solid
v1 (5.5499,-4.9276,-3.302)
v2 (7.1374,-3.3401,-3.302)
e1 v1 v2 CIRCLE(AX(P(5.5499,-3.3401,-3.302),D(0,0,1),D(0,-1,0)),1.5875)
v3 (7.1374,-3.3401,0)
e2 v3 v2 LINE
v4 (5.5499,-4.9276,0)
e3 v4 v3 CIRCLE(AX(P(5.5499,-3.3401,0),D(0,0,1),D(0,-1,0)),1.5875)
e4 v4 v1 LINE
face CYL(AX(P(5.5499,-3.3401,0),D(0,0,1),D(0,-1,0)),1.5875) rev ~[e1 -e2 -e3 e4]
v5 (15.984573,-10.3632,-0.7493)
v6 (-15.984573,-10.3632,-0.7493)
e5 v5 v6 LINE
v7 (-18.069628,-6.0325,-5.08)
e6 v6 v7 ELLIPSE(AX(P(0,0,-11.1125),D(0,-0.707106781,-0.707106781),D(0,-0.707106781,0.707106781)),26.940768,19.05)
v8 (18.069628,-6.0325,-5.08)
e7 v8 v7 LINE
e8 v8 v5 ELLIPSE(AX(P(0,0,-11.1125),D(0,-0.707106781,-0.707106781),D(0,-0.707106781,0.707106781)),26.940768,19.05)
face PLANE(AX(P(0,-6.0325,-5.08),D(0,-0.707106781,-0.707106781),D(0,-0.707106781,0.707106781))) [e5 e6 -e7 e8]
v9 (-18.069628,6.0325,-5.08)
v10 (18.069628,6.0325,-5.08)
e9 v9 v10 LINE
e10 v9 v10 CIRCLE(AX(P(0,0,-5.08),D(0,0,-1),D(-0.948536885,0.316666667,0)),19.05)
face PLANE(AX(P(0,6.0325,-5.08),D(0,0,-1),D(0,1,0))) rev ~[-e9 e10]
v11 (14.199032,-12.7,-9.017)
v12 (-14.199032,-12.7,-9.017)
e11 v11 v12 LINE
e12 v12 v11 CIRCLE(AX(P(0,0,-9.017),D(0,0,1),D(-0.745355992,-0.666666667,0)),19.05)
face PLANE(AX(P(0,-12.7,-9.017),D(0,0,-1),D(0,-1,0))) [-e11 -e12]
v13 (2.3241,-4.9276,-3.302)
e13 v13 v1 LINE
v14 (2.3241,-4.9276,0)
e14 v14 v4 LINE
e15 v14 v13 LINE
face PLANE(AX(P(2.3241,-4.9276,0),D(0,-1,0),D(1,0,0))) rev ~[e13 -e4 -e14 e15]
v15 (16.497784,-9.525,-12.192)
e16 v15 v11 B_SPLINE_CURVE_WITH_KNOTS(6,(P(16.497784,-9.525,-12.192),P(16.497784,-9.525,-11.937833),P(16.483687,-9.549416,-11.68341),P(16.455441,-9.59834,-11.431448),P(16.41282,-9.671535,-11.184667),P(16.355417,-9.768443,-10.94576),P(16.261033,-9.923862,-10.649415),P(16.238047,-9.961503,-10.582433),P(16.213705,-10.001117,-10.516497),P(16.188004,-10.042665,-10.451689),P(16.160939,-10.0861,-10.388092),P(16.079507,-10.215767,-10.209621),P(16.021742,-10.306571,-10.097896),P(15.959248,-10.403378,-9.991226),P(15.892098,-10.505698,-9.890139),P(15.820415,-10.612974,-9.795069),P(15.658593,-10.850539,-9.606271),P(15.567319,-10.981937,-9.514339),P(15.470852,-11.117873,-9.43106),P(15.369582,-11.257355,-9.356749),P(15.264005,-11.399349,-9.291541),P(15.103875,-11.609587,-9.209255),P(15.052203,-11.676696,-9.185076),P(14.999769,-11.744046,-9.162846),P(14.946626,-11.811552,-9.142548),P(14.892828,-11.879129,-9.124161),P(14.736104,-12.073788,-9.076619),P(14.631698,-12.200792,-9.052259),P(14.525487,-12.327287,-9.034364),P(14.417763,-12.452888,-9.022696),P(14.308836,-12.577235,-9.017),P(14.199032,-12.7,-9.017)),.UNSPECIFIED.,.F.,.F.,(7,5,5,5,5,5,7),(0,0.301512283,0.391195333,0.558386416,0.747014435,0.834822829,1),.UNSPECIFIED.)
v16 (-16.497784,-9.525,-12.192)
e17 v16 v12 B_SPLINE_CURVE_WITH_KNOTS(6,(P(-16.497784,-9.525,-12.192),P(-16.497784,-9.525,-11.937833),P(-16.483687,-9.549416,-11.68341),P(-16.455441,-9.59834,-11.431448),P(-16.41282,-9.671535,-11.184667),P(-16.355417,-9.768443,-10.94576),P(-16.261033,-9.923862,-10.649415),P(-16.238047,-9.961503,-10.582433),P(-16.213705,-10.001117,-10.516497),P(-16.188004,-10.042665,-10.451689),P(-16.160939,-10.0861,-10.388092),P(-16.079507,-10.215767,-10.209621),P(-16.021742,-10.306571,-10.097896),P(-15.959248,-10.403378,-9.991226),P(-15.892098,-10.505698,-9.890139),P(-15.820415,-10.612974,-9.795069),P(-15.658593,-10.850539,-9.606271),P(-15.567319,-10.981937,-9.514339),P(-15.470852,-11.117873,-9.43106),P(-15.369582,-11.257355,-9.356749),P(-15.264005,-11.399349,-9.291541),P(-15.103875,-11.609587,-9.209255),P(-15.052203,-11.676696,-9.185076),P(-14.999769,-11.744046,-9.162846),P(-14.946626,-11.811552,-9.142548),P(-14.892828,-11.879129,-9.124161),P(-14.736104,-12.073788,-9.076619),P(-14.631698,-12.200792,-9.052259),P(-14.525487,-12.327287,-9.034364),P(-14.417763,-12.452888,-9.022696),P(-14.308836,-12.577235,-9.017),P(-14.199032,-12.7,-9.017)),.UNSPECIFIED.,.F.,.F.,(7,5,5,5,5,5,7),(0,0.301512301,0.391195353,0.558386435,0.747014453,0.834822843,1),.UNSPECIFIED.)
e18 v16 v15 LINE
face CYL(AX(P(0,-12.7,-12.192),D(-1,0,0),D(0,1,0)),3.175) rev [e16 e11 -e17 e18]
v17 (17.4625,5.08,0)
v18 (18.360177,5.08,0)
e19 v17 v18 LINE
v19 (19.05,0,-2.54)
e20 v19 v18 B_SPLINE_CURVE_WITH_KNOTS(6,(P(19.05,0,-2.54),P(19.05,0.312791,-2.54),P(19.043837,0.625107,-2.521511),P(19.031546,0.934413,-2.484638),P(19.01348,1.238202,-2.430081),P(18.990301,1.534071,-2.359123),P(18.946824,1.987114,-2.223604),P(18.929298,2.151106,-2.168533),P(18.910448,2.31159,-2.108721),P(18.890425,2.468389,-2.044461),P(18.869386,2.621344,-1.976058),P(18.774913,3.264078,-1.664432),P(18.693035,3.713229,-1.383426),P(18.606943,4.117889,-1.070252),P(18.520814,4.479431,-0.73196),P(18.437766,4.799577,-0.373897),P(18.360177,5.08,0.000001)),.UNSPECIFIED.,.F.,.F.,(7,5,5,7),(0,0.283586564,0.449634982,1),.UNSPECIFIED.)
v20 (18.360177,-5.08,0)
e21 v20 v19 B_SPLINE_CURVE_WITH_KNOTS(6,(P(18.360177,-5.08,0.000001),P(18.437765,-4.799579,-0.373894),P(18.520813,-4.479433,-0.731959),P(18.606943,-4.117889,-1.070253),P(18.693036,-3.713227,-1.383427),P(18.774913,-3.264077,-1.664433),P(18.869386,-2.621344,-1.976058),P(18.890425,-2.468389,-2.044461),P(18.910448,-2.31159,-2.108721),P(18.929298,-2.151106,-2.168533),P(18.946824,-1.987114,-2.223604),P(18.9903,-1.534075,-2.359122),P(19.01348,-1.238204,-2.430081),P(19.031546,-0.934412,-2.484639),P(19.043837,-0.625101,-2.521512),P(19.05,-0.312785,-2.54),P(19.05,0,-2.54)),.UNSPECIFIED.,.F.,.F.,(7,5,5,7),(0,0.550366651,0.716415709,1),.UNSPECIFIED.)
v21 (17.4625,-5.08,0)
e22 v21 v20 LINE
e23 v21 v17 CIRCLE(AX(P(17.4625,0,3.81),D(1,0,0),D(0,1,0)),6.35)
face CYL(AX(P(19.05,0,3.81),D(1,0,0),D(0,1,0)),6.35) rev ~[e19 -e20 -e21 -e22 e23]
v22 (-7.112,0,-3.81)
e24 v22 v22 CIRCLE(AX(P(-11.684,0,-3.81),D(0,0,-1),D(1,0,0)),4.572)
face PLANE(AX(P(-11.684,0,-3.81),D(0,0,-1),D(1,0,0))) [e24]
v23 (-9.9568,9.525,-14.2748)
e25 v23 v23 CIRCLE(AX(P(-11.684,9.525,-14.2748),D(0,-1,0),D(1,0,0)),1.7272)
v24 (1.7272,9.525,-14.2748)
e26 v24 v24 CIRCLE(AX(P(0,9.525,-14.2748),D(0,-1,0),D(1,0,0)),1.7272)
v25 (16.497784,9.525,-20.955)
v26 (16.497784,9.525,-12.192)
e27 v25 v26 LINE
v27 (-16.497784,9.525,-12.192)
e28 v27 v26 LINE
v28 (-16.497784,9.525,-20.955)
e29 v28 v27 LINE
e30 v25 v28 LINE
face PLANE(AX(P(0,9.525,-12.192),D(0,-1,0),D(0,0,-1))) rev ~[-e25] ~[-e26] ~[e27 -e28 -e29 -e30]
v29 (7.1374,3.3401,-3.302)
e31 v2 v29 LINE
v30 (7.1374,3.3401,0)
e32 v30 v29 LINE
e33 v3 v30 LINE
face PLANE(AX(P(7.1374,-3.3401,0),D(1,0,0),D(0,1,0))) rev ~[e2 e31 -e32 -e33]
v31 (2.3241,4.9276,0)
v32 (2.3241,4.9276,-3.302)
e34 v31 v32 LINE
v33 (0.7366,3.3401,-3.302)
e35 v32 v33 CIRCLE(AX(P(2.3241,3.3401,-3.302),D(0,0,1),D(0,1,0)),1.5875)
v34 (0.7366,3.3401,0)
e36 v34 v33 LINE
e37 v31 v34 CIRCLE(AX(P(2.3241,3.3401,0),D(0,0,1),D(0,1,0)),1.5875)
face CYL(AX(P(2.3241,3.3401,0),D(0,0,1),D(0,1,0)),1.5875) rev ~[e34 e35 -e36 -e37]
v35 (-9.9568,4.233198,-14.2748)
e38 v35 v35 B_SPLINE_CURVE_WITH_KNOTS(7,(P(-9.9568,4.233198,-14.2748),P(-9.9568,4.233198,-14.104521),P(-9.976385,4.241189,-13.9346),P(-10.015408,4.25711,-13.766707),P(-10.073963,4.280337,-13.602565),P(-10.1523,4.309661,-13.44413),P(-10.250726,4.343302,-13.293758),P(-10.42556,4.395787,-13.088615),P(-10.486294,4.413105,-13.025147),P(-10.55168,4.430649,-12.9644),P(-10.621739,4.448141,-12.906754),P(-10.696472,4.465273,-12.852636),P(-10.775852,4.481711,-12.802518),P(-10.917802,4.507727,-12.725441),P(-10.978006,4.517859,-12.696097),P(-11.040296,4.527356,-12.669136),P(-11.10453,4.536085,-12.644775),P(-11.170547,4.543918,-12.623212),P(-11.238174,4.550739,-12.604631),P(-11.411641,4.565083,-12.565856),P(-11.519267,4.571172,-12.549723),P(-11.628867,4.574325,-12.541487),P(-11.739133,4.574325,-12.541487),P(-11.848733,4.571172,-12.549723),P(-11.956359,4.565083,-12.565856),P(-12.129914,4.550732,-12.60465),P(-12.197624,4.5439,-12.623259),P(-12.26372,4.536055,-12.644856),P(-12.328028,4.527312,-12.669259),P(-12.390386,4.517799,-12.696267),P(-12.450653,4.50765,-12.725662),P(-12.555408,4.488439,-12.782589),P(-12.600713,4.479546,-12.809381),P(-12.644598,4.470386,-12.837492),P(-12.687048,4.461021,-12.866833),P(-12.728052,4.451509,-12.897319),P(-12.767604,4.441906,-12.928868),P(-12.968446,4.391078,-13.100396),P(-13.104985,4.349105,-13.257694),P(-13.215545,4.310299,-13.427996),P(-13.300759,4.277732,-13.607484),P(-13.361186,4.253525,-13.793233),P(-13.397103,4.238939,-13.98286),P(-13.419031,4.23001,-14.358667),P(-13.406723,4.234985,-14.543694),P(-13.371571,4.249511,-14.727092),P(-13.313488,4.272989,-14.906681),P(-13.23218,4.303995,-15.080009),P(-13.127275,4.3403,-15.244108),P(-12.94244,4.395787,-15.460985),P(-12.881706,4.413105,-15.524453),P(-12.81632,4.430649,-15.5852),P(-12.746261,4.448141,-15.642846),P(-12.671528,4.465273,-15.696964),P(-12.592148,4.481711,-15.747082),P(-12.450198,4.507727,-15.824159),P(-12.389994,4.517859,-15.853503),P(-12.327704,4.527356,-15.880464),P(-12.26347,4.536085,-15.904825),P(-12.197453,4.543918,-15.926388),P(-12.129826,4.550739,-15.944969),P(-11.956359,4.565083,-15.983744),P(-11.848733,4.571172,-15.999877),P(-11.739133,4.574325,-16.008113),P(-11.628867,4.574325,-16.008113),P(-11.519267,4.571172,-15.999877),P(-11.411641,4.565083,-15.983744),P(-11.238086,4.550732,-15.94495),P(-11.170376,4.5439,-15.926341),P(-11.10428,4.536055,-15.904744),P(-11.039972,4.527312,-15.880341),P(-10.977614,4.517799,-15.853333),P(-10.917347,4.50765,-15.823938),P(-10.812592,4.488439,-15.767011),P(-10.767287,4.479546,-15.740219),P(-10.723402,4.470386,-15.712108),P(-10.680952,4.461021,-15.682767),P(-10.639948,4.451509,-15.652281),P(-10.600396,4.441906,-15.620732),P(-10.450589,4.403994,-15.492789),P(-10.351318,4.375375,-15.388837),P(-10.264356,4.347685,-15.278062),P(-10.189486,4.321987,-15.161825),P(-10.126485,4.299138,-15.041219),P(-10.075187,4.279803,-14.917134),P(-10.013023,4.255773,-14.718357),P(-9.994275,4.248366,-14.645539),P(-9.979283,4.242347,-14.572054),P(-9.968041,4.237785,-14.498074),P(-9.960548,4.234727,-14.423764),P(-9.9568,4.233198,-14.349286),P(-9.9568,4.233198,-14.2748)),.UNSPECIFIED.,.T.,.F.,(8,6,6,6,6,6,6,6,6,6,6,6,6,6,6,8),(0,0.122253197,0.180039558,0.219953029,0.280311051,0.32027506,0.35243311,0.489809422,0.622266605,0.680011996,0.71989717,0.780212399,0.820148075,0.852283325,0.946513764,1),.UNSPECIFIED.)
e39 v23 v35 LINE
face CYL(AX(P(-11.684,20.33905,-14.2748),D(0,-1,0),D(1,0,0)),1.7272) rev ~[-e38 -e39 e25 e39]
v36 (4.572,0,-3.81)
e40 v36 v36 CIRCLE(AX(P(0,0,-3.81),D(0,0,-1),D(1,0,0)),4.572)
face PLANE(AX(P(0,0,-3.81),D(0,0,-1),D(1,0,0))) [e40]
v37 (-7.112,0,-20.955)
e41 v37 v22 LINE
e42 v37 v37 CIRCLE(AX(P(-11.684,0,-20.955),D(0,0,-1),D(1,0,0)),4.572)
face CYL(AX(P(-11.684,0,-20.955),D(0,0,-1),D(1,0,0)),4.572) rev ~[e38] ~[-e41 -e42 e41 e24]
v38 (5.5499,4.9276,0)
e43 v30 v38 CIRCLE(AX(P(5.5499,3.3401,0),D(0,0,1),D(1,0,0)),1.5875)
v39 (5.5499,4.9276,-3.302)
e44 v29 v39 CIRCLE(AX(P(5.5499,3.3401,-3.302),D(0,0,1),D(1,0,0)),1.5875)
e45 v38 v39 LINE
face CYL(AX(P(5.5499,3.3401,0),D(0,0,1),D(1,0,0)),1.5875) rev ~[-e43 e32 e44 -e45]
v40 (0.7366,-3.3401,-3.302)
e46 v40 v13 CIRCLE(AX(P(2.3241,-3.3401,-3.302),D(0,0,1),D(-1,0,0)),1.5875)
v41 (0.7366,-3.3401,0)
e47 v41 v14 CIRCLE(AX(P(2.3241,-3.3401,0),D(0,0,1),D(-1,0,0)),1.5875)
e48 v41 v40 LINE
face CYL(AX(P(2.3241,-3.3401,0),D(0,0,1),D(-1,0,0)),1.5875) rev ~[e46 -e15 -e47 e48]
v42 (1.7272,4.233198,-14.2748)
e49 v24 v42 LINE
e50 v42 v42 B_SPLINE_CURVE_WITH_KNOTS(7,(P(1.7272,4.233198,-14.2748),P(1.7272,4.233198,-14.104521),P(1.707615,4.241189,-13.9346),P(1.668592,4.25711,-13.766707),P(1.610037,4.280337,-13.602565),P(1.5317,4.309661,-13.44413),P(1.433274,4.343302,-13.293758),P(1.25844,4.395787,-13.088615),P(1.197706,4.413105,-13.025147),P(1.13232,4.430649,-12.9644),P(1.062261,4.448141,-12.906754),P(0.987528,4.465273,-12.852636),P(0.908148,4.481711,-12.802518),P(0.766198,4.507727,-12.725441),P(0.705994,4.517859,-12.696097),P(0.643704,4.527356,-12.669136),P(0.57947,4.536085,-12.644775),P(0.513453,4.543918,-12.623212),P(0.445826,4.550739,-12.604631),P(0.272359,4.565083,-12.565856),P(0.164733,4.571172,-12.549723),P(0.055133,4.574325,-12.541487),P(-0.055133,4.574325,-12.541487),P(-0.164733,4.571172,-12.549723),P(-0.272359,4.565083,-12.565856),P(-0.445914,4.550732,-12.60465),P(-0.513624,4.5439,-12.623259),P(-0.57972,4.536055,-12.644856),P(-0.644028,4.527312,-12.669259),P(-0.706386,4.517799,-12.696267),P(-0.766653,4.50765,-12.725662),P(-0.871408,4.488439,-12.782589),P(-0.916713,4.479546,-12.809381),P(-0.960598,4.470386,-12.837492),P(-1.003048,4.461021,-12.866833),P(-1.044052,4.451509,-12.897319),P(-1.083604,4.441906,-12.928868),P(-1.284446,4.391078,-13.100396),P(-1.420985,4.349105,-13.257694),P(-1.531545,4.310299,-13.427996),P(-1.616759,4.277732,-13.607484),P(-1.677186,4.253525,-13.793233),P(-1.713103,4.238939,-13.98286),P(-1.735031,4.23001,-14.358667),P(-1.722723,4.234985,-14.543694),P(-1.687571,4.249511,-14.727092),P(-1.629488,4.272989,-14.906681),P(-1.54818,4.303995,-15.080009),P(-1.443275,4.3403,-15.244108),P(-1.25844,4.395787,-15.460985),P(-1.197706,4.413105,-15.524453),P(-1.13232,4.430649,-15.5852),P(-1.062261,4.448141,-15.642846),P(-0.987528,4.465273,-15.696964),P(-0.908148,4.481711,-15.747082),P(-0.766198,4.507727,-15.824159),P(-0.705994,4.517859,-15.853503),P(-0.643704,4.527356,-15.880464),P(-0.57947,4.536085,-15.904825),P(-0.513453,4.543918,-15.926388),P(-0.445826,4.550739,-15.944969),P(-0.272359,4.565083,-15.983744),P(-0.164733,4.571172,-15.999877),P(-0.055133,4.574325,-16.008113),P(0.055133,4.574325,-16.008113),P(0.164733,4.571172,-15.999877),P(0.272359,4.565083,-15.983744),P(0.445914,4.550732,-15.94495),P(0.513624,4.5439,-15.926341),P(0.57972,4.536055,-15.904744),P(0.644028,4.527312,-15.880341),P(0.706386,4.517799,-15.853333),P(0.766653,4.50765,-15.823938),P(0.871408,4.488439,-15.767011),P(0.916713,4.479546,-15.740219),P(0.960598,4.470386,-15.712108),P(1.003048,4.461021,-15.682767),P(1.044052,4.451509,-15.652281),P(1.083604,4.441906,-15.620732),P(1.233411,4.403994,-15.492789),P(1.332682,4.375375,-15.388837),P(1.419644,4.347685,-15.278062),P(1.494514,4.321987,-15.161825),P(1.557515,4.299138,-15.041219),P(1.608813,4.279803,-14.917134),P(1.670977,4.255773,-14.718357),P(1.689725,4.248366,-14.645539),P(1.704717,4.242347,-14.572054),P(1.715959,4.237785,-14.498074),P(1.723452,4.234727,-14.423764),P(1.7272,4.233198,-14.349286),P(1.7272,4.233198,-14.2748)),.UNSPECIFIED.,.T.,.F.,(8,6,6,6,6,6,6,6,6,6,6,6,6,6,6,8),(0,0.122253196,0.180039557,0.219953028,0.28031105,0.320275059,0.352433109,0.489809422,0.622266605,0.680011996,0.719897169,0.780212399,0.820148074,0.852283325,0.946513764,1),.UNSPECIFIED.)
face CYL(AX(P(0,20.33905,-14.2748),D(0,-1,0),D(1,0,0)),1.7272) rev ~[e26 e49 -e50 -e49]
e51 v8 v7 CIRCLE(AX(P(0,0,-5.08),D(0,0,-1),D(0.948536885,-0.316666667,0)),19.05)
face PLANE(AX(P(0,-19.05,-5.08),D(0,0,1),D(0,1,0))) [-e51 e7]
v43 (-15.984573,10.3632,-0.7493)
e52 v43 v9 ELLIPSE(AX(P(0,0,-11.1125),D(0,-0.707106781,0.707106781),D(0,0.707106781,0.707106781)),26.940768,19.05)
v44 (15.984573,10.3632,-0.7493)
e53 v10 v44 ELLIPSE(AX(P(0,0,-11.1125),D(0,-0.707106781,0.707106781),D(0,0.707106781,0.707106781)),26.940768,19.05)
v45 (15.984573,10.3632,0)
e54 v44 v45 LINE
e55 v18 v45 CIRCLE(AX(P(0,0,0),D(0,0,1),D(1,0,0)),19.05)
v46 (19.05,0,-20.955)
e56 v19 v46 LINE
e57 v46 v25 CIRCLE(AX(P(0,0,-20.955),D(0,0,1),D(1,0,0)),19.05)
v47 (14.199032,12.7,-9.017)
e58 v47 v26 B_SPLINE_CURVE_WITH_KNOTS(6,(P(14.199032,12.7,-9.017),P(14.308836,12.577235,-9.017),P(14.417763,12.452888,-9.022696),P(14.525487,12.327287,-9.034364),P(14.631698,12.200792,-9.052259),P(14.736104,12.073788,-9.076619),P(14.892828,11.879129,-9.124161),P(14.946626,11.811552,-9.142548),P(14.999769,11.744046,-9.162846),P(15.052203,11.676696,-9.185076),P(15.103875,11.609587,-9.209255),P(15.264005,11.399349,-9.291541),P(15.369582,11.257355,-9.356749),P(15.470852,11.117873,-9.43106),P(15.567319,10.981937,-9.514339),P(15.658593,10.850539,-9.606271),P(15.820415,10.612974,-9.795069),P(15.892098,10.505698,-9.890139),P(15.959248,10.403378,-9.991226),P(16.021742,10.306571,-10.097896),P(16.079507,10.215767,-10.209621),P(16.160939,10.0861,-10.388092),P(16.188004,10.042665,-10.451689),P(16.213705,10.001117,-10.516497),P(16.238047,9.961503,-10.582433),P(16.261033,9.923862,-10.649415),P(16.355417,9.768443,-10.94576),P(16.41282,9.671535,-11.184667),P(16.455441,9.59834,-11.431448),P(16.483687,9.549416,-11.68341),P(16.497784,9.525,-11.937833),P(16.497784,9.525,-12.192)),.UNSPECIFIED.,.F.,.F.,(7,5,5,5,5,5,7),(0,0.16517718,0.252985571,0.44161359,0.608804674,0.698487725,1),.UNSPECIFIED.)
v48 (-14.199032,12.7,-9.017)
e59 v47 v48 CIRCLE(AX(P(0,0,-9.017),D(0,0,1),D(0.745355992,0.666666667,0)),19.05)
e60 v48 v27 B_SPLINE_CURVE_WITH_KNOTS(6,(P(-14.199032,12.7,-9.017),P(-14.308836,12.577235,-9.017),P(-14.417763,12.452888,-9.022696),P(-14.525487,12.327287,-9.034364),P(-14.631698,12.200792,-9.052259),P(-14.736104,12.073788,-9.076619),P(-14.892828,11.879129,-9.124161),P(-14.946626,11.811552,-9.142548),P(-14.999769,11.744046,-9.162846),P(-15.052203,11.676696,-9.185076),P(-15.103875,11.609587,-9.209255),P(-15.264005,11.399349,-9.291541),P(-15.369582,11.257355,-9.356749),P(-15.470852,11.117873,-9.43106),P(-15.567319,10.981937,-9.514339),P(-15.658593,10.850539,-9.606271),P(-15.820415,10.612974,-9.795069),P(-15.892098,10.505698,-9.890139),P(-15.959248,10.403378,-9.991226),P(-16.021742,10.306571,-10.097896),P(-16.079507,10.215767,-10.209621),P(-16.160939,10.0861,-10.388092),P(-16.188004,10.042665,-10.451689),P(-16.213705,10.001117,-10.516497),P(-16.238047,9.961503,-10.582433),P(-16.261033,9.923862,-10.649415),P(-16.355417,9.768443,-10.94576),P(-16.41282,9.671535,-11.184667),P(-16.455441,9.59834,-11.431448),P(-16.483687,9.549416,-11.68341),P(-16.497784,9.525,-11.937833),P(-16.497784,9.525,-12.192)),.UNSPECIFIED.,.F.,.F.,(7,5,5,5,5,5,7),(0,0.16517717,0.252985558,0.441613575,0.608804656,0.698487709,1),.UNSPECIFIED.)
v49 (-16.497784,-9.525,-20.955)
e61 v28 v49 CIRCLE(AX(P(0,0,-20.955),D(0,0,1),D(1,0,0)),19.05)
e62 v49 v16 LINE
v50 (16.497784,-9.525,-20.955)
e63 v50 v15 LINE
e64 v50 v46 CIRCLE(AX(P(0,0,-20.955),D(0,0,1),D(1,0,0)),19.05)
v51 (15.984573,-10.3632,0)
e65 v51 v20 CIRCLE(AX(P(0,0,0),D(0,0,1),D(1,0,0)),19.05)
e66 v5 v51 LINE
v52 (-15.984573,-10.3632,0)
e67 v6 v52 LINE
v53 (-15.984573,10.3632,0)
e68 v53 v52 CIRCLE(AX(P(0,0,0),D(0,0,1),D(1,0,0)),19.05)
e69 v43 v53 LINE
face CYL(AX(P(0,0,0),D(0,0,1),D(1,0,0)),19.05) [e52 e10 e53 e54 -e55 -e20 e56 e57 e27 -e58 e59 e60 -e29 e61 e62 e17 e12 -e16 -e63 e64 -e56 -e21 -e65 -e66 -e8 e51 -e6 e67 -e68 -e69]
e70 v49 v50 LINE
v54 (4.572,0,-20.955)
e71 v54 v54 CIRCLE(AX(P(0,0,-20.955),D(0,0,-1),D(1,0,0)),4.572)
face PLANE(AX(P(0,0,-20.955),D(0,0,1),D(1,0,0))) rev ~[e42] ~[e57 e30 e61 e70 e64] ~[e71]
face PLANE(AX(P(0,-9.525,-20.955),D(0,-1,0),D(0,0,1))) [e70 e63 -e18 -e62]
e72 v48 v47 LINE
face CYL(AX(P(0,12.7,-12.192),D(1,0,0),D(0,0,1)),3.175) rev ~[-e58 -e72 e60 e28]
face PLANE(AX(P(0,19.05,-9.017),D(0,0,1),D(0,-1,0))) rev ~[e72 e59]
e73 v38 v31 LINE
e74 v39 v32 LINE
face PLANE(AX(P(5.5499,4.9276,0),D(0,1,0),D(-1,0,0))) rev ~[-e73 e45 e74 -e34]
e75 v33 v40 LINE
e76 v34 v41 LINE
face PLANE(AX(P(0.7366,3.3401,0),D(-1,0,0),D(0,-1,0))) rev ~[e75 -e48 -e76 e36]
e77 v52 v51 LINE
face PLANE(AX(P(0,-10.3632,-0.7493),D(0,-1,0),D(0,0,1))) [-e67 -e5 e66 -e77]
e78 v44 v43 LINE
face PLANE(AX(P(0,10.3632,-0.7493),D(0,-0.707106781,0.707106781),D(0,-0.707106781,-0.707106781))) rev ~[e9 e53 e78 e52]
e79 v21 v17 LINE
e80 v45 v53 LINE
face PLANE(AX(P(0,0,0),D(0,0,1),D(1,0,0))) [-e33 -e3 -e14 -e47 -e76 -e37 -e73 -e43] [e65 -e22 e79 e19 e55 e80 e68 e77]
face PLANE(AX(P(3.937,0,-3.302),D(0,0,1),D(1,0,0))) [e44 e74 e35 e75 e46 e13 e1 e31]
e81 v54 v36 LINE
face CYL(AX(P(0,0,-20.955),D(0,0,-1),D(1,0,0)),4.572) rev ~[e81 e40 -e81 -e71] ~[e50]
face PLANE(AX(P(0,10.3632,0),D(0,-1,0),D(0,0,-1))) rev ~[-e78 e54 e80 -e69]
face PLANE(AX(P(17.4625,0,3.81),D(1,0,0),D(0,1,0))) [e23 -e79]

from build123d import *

# Parameters (mm, degrees)
F0_R      = 19.05
F1_DEPTH  = 20.955
F3_DEPTH  = 25.4
F5_DEPTH  = 25.4
F6_R      = 4.572
F7_DEPTH  = 17.145
F9_D      = 3.4544
F9_DEPTH  = 10.81405
F9_TIP    = 1.0378064612
F11_R     = 6.35
F12_DEPTH = 1.5875
F14_DEPTH = 3.302


# Not quite as in the source:
# - a feature names something its author has since deleted; it is built from what else it names


with BuildPart() as f1:
    # F0 (on Top) → F1 (new body)
    with BuildSketch(Plane.XY):
        Circle(F0_R)
    extrude(amount=-F1_DEPTH)

    # F2 (on Right) → F3 (cut, symmetric)
    with BuildSketch(Plane.YZ):
        Polygon((-10.3632, -0.7493), (-10.3632, 0), (-19.05, 0), (-19.05, -5.08), (-6.0325, -5.08), align=None)
        Polygon((10.3632, -0.7493), (6.0325, -5.08), (19.05, -5.08), (19.05, 0), (10.3632, 0), align=None)
    extrude(amount=F3_DEPTH, both=True, mode=Mode.SUBTRACT)

    # F4 (on Right) → F5 (cut, symmetric)
    with BuildSketch(Plane.YZ):
        with BuildLine():
            Line((-19.05, -20.955), (-9.525, -20.955))
            Line((-9.525, -20.955), (-9.525, -12.192))
            ThreePointArc((-9.525, -12.192), (-10.4549359697, -9.9469359697), (-12.7, -9.017))
            Line((-12.7, -9.017), (-19.05, -9.017))
            Line((-19.05, -9.017), (-19.05, -20.955))
        make_face()
        with BuildLine():
            Line((19.05, -9.017), (12.7, -9.017))
            ThreePointArc((12.7, -9.017), (10.4549359697, -9.9469359697), (9.525, -12.192))
            Line((9.525, -12.192), (9.525, -20.955))
            Line((9.525, -20.955), (19.05, -20.955))
            Line((19.05, -20.955), (19.05, -9.017))
        make_face()
    extrude(amount=F5_DEPTH, both=True, mode=Mode.SUBTRACT)

    # F6 (on face) → F7 (cut)
    with BuildSketch(Plane(origin=(0, 0, -20.955), x_dir=(1, 0, 0), z_dir=(0, 0, -1))):
        Circle(F6_R)
        with Locations((-11.684, 0)):
            Circle(F6_R)
    extrude(amount=-F7_DEPTH, mode=Mode.SUBTRACT)

    # F9
    with Locations(Plane(origin=(0, 9.525, 0), x_dir=(-1, 0, 0), z_dir=(0, 1, 0))):
        with Locations((0, -14.2748), (11.684, -14.2748)):
            Hole(F9_D / 2, depth=F9_DEPTH)
            with Locations((0, 0, -(F9_DEPTH + F9_TIP / 2))):  # 118° drill point
                Cone(0, F9_D / 2, F9_TIP, mode=Mode.SUBTRACT)

    # F11 (on offset) → F12 (cut)
    with BuildSketch(Plane.YZ.offset(19.05)):
        with Locations((0, 3.81)):
            Circle(F11_R)
    extrude(amount=-F12_DEPTH, mode=Mode.SUBTRACT)

    # F13 (on face) → F14 (cut)
    with BuildSketch(Plane.XY):
        with BuildLine():
            Line((5.5499, 4.9276), (2.3241, 4.9276))
            ThreePointArc((2.3241, 4.9276), (1.2015679849, 4.4626320151), (0.7366, 3.3401))
            Line((0.7366, 3.3401), (0.7366, -3.3401))
            ThreePointArc((0.7366, -3.3401), (1.2015679849, -4.4626320151), (2.3241, -4.9276))
            Line((2.3241, -4.9276), (5.5499, -4.9276))
            ThreePointArc((5.5499, -4.9276), (6.6724320151, -4.4626320151), (7.1374, -3.3401))
            Line((7.1374, -3.3401), (7.1374, 3.3401))
            ThreePointArc((7.1374, 3.3401), (6.6724320151, 4.4626320151), (5.5499, 4.9276))
        make_face()
    extrude(amount=-F14_DEPTH, mode=Mode.SUBTRACT)


solid = f1.part
